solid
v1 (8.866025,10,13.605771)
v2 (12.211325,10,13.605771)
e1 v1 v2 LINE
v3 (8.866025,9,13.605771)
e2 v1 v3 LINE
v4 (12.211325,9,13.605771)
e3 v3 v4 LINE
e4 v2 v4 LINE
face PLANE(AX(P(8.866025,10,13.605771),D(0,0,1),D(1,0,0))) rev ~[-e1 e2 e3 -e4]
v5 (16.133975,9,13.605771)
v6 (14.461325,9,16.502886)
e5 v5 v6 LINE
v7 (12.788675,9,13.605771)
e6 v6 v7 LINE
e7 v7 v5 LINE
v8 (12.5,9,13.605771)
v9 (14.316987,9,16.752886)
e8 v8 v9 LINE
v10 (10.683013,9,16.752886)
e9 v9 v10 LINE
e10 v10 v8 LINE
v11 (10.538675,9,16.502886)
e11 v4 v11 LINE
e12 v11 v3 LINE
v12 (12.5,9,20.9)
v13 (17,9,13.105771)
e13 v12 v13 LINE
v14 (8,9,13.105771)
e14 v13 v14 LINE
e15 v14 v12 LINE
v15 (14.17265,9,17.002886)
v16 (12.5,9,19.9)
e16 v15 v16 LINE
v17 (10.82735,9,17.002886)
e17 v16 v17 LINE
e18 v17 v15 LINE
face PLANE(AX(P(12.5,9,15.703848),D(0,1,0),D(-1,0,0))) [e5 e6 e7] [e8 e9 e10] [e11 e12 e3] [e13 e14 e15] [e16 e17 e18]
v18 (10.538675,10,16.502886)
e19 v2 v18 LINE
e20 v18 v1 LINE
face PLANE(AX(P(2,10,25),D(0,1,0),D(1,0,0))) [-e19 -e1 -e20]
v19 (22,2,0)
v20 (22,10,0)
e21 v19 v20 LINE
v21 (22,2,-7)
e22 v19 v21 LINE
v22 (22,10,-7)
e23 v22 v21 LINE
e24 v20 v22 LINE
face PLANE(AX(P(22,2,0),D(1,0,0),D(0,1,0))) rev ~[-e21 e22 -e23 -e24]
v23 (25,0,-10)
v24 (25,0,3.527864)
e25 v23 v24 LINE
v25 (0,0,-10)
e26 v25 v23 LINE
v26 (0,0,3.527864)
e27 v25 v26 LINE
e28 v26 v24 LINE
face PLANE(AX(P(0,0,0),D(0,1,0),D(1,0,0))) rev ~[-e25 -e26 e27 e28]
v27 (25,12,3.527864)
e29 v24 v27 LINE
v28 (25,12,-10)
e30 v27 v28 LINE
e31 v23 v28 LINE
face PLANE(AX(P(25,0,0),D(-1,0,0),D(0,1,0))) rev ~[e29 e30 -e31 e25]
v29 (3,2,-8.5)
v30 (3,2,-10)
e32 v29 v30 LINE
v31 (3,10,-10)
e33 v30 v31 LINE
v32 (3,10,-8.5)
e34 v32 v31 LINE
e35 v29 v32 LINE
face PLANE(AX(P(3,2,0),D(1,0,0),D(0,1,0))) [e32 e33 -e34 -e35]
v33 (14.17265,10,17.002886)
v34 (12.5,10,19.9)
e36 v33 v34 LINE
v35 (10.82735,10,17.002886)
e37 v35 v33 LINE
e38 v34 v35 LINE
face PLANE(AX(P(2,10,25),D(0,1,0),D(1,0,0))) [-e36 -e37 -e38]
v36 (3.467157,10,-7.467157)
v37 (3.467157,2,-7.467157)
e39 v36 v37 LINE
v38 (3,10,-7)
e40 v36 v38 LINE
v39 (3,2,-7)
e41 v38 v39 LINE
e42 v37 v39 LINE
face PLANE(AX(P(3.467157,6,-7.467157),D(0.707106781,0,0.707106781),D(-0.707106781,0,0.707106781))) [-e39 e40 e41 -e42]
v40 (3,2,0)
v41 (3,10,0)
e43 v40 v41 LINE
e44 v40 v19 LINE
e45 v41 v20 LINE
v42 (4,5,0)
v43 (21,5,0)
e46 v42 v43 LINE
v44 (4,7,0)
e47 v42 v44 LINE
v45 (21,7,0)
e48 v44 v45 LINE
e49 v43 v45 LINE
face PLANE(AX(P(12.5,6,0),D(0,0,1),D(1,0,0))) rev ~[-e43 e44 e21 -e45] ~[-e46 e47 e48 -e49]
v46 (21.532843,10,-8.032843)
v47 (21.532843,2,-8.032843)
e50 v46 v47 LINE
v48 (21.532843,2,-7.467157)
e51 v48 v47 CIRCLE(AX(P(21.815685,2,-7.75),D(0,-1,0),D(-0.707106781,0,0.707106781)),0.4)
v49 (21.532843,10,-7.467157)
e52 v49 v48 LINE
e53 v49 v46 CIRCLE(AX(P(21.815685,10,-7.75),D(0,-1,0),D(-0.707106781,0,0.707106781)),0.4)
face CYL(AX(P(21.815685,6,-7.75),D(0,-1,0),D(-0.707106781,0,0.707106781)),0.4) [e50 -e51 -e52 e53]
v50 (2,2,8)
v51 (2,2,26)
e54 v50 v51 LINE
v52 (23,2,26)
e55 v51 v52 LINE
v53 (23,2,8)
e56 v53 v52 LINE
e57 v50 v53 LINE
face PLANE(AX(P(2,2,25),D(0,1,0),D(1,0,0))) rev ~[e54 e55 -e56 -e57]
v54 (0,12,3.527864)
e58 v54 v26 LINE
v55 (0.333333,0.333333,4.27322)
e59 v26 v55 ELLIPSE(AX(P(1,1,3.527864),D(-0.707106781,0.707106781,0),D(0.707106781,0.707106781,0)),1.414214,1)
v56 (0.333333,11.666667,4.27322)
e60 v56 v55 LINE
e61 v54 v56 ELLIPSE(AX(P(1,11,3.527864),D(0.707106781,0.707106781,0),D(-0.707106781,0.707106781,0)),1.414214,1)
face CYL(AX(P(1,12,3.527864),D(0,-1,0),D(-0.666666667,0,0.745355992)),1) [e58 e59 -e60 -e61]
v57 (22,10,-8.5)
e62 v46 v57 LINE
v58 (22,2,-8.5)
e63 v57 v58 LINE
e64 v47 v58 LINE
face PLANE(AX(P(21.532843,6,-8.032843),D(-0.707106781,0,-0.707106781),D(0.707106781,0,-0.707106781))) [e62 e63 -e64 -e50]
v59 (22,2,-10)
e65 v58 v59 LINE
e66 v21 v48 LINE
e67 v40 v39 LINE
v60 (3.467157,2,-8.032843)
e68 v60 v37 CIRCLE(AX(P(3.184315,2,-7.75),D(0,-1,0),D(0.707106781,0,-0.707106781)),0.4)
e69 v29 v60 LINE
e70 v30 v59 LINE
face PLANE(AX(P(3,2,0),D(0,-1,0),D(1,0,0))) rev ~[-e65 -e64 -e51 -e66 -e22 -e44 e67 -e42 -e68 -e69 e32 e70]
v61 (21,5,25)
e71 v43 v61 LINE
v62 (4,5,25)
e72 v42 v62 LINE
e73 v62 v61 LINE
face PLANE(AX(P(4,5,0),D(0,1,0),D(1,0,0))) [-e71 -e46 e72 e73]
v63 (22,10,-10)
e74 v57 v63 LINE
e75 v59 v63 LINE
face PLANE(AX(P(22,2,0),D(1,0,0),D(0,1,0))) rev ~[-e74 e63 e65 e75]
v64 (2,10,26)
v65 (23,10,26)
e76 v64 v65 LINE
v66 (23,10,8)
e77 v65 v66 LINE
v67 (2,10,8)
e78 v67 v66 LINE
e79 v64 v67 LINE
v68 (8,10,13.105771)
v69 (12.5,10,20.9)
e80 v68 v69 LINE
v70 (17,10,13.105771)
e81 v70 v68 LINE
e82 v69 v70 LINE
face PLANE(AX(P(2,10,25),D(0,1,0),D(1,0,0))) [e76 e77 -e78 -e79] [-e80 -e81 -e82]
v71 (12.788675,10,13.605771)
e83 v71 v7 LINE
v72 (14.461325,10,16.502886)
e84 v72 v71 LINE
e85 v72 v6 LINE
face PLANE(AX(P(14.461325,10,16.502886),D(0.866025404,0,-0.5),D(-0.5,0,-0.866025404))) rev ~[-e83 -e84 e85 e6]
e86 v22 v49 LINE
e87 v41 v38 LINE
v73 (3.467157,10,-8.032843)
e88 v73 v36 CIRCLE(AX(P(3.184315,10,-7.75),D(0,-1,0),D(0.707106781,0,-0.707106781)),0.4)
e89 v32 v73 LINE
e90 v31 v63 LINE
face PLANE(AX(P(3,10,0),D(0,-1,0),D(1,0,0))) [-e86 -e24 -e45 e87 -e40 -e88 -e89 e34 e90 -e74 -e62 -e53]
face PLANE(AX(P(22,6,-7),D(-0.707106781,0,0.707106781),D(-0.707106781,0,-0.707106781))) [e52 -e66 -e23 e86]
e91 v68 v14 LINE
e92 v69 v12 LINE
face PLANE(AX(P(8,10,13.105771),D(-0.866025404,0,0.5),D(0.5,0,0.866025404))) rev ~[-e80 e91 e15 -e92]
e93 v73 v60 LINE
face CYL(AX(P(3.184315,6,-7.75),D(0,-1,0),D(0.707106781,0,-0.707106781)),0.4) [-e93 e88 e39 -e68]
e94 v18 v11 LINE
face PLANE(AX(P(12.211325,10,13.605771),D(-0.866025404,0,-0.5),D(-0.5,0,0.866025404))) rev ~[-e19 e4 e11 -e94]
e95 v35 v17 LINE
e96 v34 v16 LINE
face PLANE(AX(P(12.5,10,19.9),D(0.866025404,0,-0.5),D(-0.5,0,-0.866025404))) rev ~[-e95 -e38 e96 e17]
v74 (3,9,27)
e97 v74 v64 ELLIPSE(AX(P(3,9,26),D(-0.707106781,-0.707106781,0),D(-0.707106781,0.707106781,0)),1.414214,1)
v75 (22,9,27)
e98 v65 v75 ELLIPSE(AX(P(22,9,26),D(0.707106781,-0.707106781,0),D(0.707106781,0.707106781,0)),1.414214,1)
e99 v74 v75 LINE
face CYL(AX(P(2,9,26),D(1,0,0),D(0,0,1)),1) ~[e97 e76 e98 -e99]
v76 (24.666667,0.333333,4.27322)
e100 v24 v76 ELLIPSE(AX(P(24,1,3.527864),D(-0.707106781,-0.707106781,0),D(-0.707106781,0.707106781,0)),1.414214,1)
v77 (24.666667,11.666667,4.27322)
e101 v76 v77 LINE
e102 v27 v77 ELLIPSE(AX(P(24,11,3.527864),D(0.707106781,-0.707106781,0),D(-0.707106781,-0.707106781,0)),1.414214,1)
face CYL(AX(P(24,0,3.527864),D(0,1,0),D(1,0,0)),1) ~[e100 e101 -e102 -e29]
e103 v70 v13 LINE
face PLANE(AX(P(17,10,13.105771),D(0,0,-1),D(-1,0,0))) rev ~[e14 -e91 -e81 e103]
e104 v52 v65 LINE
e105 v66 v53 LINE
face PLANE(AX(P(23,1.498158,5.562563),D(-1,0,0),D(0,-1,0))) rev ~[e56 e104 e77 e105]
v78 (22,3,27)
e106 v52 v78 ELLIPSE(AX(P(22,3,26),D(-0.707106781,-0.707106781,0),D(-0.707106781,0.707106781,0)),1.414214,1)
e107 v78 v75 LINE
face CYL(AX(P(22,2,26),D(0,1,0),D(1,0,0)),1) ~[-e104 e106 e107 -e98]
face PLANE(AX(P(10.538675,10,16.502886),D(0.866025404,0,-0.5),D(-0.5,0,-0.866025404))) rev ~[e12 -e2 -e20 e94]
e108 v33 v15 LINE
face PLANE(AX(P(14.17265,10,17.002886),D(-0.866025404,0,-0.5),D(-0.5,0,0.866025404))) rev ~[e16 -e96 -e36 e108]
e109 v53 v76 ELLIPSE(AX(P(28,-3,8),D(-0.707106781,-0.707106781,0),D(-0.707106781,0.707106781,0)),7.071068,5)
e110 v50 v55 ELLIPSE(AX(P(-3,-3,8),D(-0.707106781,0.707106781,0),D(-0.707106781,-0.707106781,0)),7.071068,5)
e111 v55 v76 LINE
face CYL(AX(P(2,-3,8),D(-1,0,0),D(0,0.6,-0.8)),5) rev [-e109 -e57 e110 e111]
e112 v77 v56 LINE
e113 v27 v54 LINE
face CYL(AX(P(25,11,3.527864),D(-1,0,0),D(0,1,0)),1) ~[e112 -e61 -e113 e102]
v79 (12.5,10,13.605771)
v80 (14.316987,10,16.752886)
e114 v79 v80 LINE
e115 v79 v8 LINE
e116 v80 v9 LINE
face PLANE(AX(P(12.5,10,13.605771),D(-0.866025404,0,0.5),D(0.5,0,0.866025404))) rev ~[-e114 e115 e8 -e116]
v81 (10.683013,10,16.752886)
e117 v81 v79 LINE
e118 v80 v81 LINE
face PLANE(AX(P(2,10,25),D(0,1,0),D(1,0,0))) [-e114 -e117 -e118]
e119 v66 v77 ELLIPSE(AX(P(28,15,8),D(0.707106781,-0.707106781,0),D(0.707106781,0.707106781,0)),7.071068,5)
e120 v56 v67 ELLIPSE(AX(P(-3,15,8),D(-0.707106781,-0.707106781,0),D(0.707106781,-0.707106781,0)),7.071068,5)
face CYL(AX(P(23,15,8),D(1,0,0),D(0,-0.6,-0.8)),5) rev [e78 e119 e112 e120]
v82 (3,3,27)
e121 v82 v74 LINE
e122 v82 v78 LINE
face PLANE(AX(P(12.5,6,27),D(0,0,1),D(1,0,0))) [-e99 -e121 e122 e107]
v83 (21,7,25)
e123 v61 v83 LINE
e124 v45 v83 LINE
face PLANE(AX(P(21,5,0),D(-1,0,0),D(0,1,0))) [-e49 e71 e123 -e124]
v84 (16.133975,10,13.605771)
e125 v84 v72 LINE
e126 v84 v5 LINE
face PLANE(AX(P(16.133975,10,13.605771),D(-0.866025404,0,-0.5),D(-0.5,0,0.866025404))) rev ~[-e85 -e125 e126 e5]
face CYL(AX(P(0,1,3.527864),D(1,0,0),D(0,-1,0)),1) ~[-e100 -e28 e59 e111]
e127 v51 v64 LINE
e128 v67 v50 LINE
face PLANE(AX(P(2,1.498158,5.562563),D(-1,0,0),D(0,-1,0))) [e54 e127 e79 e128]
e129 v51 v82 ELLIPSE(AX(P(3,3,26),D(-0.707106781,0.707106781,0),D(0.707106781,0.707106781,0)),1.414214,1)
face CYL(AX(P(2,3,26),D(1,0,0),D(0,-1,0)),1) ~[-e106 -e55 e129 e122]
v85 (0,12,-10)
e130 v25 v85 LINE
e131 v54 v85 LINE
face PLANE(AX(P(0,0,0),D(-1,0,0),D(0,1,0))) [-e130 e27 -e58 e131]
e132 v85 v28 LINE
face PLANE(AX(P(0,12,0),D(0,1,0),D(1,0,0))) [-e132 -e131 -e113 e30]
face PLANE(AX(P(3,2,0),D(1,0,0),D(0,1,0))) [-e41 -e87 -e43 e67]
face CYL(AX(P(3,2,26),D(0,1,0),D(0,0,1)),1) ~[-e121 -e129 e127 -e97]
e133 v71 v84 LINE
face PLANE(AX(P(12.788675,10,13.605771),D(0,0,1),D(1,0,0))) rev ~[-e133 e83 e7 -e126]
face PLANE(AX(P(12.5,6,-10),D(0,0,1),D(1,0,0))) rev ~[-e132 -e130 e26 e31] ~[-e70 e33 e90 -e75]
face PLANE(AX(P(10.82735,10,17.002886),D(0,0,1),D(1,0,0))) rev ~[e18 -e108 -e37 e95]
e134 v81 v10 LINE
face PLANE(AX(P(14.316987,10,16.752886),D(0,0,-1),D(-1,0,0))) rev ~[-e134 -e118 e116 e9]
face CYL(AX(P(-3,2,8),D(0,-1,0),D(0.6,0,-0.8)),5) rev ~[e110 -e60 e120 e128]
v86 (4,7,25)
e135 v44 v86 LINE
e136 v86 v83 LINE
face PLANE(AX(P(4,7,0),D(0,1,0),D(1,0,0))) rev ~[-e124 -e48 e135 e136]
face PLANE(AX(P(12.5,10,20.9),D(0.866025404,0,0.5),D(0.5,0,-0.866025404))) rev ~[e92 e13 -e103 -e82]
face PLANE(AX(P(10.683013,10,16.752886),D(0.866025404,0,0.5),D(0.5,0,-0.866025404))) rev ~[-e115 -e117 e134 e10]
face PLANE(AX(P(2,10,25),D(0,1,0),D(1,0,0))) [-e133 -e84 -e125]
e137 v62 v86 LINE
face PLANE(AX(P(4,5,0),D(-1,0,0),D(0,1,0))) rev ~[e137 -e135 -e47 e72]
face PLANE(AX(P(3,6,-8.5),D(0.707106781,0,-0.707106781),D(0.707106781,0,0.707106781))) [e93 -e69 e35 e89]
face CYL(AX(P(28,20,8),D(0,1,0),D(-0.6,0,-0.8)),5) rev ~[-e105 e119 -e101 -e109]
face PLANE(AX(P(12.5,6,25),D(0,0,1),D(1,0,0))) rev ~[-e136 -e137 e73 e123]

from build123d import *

# Parameters (mm, degrees)
F0_W           = 25
F0_H           = 12
F0_W_2         = 19
F0_H_2         = 8
F1_DEPTH       = 10
F2_W           = 21
F2_H           = 8
F2_W_2         = 17
F2_H_2         = 2
F3_DEPTH       = 25
F4_W           = 21
F4_H           = 8
F4_W_2         = 17
F4_H_2         = 2
F5_DEPTH       = 2
F6_W           = 25
F6_H           = 12
F7_DEPTH       = 4
F10_DEPTH      = 4
F10_DEPTH_BACK = 4
F11_T1_DEPTH   = 21
F11_T3_DEPTH   = 8
F11_T9_DEPTH   = 31
F11_T14_DEPTH  = 18
F11_T22_DEPTH  = 31
F11_T27_DEPTH  = 18
F11_T35_DEPTH  = 31
F11_T40_DEPTH  = 18
F11_T48_DEPTH  = 18
F11_T53_DEPTH  = 31
F12_R          = 1
F14_DEPTH      = 1


# Not quite as in the source:
# - a fillet or chamfer that OpenCascade refuses, or shapes differently, is made with other operations: its cross-section is extruded or revolved along the edge and cut away or added


with BuildPart() as f1:
    # F0 (on Top) → F1 (new body)
    with BuildSketch(Plane.XY):
        with Locations((12.5, 6)):
            Rectangle(F0_W, F0_H)
        with Locations((12.5, 6)):
            Rectangle(F0_W_2, F0_H_2, mode=Mode.SUBTRACT)
    extrude(amount=-F1_DEPTH)

    # F2 (on Top) → F3 (join)
    with BuildSketch(Plane.XY):
        with Locations((12.5, 6)):
            Rectangle(F2_W, F2_H)
        with Locations((12.5, 6)):
            Rectangle(F2_W_2, F2_H_2, mode=Mode.SUBTRACT)
    extrude(amount=F3_DEPTH)

    # F4 (on face) → F5 (join)
    with BuildSketch(Plane.XY.offset(25)):
        with Locations((12.5, 6)):
            Rectangle(F4_W, F4_H)
        with Locations((12.5, 6)):
            Rectangle(F4_W_2, F4_H_2, mode=Mode.SUBTRACT)
        with Locations((12.5, 6)):
            Rectangle(F4_W_2, F4_H_2)
    extrude(amount=F5_DEPTH)

    # F6 (on face) → F7 (join)
    with BuildSketch(Plane.XY):
        with Locations((12.5, 6)):
            Rectangle(F6_W, F6_H)
        Polygon((23, 2), (22, 2), (3, 2), (2, 2), (2, 10), (3, 10), (22, 10), (23, 10), align=None, mode=Mode.SUBTRACT)
    extrude(amount=F7_DEPTH)

    # F9 (on offset) → F10 (join, two sides)
    with BuildSketch(Plane.XZ.offset(-6)) as f10_sk:
        with BuildLine():
            Line((3, -7), (3, -8.5))
            Line((3, -8.5), (3.4671572875, -8.0328427125))
            ThreePointArc((3.4671572875, -8.0328427125), (3.5843145751, -7.75), (3.4671572875, -7.4671572875))
            Line((3.4671572875, -7.4671572875), (3, -7))
        make_face()
        with BuildLine():
            Line((21.5328427125, -8.0328427125), (22, -8.5))
            Line((22, -8.5), (22, -7))
            Line((22, -7), (21.5328427125, -7.4671572875))
            ThreePointArc((21.5328427125, -7.4671572875), (21.4156854249, -7.75), (21.5328427125, -8.0328427125))
        make_face()
    extrude(amount=F10_DEPTH)
    extrude(f10_sk.sketch, amount=-F10_DEPTH_BACK)

    # F11: fillet of radius 5 on 4 edges, made by hand

    # F11_s2 → F11_t1 (join)
    with BuildSketch(Plane.YZ.offset(2)):
        with BuildLine():
            ThreePointArc((0, 4), (1.472135955, 5.7639320225), (2, 8))
            Line((2, 8), (2, 4))
            Line((2, 4), (0, 4))
        make_face()
        with BuildLine():
            ThreePointArc((12, 4), (10.527864045, 5.7639320225), (10, 8))
            Line((10, 8), (10, 4))
            Line((10, 4), (12, 4))
        make_face()
    extrude(amount=F11_T1_DEPTH)

    # F11_s4 → F11_t3 (join)
    with BuildSketch(Plane.XZ.offset(-10)):
        with BuildLine():
            ThreePointArc((25, 4), (23.527864045, 5.7639320225), (23, 8))
            Line((23, 8), (23, 4))
            Line((23, 4), (25, 4))
        make_face()
        with BuildLine():
            ThreePointArc((0, 4), (1.472135955, 5.7639320225), (2, 8))
            Line((2, 8), (2, 4))
            Line((2, 4), (0, 4))
        make_face()
    extrude(amount=F11_T3_DEPTH)


with BuildPart() as f11_tool7:
    # F11_s8 → F11_t9 (new body)
    with BuildSketch(Plane.YZ.offset(-8)):
        with BuildLine():
            ThreePointArc((0, 4), (1.472135955, 5.7639320225), (2, 8))
            Line((2, 8), (2, 4))
            Line((2, 4), (0, 4))
        make_face()
    extrude(amount=F11_T9_DEPTH)

    split(bisect_by=Plane.YZ, keep=Keep.TOP)

    split(bisect_by=Plane.YZ.offset(2), keep=Keep.BOTTOM)


with BuildPart() as f11_tool12:
    # F11_s13 → F11_t14 (new body)
    with BuildSketch(Plane.XZ.offset(8)):
        with BuildLine():
            ThreePointArc((0, 4), (1.472135955, 5.7639320225), (2, 8))
            Line((2, 8), (2, 4))
            Line((2, 4), (0, 4))
        make_face()
    extrude(amount=-F11_T14_DEPTH)

    split(bisect_by=Plane.XZ, keep=Keep.BOTTOM)

    split(bisect_by=Plane.XZ.offset(-2), keep=Keep.TOP)


with BuildPart() as f11_tool7_1:
    add(f11_tool7.part)

    # F11_t17: intersect F11_tool12
    add(f11_tool12.part, mode=Mode.INTERSECT)


with BuildPart() as f1_1:
    add(f1.part)

    # F11_t5: union F11_tool7
    add(f11_tool7_1.part)


with BuildPart() as f11_tool20:
    # F11_s21 → F11_t22 (new body)
    with BuildSketch(Plane.YZ.offset(2)):
        with BuildLine():
            ThreePointArc((0, 4), (1.472135955, 5.7639320225), (2, 8))
            Line((2, 8), (2, 4))
            Line((2, 4), (0, 4))
        make_face()
    extrude(amount=F11_T22_DEPTH)

    split(bisect_by=Plane.YZ.offset(25), keep=Keep.BOTTOM)

    split(bisect_by=Plane.YZ.offset(23), keep=Keep.TOP)


with BuildPart() as f11_tool25:
    # F11_s26 → F11_t27 (new body)
    with BuildSketch(Plane.XZ.offset(-10)):
        with BuildLine():
            ThreePointArc((25, 4), (23.527864045, 5.7639320225), (23, 8))
            Line((23, 8), (23, 4))
            Line((23, 4), (25, 4))
        make_face()
    extrude(amount=F11_T27_DEPTH)

    split(bisect_by=Plane.XZ, keep=Keep.BOTTOM)

    split(bisect_by=Plane.XZ.offset(-2), keep=Keep.TOP)


with BuildPart() as f11_tool20_1:
    add(f11_tool20.part)

    # F11_t30: intersect F11_tool25
    add(f11_tool25.part, mode=Mode.INTERSECT)


with BuildPart() as f1_2:
    add(f1_1.part)

    # F11_t18: union F11_tool20
    add(f11_tool20_1.part)


with BuildPart() as f11_tool33:
    # F11_s34 → F11_t35 (new body)
    with BuildSketch(Plane.YZ.offset(33)):
        with BuildLine():
            ThreePointArc((12, 4), (10.527864045, 5.7639320225), (10, 8))
            Line((10, 8), (10, 4))
            Line((10, 4), (12, 4))
        make_face()
    extrude(amount=-F11_T35_DEPTH)

    split(bisect_by=Plane.YZ.offset(25), keep=Keep.BOTTOM)

    split(bisect_by=Plane.YZ.offset(23), keep=Keep.TOP)


with BuildPart() as f11_tool38:
    # F11_s39 → F11_t40 (new body)
    with BuildSketch(Plane.XZ.offset(-20)):
        with BuildLine():
            ThreePointArc((25, 4), (23.527864045, 5.7639320225), (23, 8))
            Line((23, 8), (23, 4))
            Line((23, 4), (25, 4))
        make_face()
    extrude(amount=F11_T40_DEPTH)

    split(bisect_by=Plane.XZ.offset(-12), keep=Keep.TOP)

    split(bisect_by=Plane.XZ.offset(-10), keep=Keep.BOTTOM)


with BuildPart() as f11_tool33_1:
    add(f11_tool33.part)

    # F11_t43: intersect F11_tool38
    add(f11_tool38.part, mode=Mode.INTERSECT)


with BuildPart() as f1_3:
    add(f1_2.part)

    # F11_t31: union F11_tool33
    add(f11_tool33_1.part)


with BuildPart() as f11_tool46:
    # F11_s47 → F11_t48 (new body)
    with BuildSketch(Plane.XZ.offset(-2)):
        with BuildLine():
            ThreePointArc((0, 4), (1.472135955, 5.7639320225), (2, 8))
            Line((2, 8), (2, 4))
            Line((2, 4), (0, 4))
        make_face()
    extrude(amount=-F11_T48_DEPTH)

    split(bisect_by=Plane.XZ.offset(-12), keep=Keep.TOP)

    split(bisect_by=Plane.XZ.offset(-10), keep=Keep.BOTTOM)


with BuildPart() as f11_tool51:
    # F11_s52 → F11_t53 (new body)
    with BuildSketch(Plane.YZ.offset(23)):
        with BuildLine():
            ThreePointArc((12, 4), (10.527864045, 5.7639320225), (10, 8))
            Line((10, 8), (10, 4))
            Line((10, 4), (12, 4))
        make_face()
    extrude(amount=-F11_T53_DEPTH)

    split(bisect_by=Plane.YZ, keep=Keep.TOP)

    split(bisect_by=Plane.YZ.offset(2), keep=Keep.BOTTOM)


with BuildPart() as f11_tool46_1:
    add(f11_tool46.part)

    # F11_t56: intersect F11_tool51
    add(f11_tool51.part, mode=Mode.INTERSECT)


with BuildPart() as f1_4:
    add(f1_3.part)

    # F11_t44: union F11_tool46
    add(f11_tool46_1.part)

    # F12
    f12_edges = [f1_4.edges().sort_by_distance(p)[0] for p in [
        (23, 6, 27),
        (12.5, 2, 27),
        (2, 6, 27),
        (12.5, 10, 27),
        (12.5, 12, 4),
        (25, 6, 4),
        (12.5, 0, 4),
        (0, 6, 4),
    ]]
    fillet(f12_edges, radius=F12_R)

    # F13 (on face) → F14 (cut)
    with BuildSketch(Plane(origin=(0, 10, 0), x_dir=(-1, 0, 0), z_dir=(0, 1, 0))):
        Polygon((-12.5, 20.9), (-17, 13.1057713659), (-8, 13.1057713659), align=None)
        Polygon((-16.1339745962, 13.6057713659), (-14.4613248654, 16.502885683), (-12.7886751346, 13.6057713659), align=None, mode=Mode.SUBTRACT)
        Polygon((-12.5, 13.6057713659), (-14.3169872981, 16.752885683), (-10.6830127019, 16.752885683), align=None, mode=Mode.SUBTRACT)
        Polygon((-8.8660254038, 13.6057713659), (-12.2113248654, 13.6057713659), (-10.5386751346, 16.502885683), align=None, mode=Mode.SUBTRACT)
        Polygon((-12.5, 19.9), (-10.8273502692, 17.002885683), (-14.1726497308, 17.002885683), align=None, mode=Mode.SUBTRACT)
    extrude(amount=-F14_DEPTH, mode=Mode.SUBTRACT)


solid = f1_4.part
